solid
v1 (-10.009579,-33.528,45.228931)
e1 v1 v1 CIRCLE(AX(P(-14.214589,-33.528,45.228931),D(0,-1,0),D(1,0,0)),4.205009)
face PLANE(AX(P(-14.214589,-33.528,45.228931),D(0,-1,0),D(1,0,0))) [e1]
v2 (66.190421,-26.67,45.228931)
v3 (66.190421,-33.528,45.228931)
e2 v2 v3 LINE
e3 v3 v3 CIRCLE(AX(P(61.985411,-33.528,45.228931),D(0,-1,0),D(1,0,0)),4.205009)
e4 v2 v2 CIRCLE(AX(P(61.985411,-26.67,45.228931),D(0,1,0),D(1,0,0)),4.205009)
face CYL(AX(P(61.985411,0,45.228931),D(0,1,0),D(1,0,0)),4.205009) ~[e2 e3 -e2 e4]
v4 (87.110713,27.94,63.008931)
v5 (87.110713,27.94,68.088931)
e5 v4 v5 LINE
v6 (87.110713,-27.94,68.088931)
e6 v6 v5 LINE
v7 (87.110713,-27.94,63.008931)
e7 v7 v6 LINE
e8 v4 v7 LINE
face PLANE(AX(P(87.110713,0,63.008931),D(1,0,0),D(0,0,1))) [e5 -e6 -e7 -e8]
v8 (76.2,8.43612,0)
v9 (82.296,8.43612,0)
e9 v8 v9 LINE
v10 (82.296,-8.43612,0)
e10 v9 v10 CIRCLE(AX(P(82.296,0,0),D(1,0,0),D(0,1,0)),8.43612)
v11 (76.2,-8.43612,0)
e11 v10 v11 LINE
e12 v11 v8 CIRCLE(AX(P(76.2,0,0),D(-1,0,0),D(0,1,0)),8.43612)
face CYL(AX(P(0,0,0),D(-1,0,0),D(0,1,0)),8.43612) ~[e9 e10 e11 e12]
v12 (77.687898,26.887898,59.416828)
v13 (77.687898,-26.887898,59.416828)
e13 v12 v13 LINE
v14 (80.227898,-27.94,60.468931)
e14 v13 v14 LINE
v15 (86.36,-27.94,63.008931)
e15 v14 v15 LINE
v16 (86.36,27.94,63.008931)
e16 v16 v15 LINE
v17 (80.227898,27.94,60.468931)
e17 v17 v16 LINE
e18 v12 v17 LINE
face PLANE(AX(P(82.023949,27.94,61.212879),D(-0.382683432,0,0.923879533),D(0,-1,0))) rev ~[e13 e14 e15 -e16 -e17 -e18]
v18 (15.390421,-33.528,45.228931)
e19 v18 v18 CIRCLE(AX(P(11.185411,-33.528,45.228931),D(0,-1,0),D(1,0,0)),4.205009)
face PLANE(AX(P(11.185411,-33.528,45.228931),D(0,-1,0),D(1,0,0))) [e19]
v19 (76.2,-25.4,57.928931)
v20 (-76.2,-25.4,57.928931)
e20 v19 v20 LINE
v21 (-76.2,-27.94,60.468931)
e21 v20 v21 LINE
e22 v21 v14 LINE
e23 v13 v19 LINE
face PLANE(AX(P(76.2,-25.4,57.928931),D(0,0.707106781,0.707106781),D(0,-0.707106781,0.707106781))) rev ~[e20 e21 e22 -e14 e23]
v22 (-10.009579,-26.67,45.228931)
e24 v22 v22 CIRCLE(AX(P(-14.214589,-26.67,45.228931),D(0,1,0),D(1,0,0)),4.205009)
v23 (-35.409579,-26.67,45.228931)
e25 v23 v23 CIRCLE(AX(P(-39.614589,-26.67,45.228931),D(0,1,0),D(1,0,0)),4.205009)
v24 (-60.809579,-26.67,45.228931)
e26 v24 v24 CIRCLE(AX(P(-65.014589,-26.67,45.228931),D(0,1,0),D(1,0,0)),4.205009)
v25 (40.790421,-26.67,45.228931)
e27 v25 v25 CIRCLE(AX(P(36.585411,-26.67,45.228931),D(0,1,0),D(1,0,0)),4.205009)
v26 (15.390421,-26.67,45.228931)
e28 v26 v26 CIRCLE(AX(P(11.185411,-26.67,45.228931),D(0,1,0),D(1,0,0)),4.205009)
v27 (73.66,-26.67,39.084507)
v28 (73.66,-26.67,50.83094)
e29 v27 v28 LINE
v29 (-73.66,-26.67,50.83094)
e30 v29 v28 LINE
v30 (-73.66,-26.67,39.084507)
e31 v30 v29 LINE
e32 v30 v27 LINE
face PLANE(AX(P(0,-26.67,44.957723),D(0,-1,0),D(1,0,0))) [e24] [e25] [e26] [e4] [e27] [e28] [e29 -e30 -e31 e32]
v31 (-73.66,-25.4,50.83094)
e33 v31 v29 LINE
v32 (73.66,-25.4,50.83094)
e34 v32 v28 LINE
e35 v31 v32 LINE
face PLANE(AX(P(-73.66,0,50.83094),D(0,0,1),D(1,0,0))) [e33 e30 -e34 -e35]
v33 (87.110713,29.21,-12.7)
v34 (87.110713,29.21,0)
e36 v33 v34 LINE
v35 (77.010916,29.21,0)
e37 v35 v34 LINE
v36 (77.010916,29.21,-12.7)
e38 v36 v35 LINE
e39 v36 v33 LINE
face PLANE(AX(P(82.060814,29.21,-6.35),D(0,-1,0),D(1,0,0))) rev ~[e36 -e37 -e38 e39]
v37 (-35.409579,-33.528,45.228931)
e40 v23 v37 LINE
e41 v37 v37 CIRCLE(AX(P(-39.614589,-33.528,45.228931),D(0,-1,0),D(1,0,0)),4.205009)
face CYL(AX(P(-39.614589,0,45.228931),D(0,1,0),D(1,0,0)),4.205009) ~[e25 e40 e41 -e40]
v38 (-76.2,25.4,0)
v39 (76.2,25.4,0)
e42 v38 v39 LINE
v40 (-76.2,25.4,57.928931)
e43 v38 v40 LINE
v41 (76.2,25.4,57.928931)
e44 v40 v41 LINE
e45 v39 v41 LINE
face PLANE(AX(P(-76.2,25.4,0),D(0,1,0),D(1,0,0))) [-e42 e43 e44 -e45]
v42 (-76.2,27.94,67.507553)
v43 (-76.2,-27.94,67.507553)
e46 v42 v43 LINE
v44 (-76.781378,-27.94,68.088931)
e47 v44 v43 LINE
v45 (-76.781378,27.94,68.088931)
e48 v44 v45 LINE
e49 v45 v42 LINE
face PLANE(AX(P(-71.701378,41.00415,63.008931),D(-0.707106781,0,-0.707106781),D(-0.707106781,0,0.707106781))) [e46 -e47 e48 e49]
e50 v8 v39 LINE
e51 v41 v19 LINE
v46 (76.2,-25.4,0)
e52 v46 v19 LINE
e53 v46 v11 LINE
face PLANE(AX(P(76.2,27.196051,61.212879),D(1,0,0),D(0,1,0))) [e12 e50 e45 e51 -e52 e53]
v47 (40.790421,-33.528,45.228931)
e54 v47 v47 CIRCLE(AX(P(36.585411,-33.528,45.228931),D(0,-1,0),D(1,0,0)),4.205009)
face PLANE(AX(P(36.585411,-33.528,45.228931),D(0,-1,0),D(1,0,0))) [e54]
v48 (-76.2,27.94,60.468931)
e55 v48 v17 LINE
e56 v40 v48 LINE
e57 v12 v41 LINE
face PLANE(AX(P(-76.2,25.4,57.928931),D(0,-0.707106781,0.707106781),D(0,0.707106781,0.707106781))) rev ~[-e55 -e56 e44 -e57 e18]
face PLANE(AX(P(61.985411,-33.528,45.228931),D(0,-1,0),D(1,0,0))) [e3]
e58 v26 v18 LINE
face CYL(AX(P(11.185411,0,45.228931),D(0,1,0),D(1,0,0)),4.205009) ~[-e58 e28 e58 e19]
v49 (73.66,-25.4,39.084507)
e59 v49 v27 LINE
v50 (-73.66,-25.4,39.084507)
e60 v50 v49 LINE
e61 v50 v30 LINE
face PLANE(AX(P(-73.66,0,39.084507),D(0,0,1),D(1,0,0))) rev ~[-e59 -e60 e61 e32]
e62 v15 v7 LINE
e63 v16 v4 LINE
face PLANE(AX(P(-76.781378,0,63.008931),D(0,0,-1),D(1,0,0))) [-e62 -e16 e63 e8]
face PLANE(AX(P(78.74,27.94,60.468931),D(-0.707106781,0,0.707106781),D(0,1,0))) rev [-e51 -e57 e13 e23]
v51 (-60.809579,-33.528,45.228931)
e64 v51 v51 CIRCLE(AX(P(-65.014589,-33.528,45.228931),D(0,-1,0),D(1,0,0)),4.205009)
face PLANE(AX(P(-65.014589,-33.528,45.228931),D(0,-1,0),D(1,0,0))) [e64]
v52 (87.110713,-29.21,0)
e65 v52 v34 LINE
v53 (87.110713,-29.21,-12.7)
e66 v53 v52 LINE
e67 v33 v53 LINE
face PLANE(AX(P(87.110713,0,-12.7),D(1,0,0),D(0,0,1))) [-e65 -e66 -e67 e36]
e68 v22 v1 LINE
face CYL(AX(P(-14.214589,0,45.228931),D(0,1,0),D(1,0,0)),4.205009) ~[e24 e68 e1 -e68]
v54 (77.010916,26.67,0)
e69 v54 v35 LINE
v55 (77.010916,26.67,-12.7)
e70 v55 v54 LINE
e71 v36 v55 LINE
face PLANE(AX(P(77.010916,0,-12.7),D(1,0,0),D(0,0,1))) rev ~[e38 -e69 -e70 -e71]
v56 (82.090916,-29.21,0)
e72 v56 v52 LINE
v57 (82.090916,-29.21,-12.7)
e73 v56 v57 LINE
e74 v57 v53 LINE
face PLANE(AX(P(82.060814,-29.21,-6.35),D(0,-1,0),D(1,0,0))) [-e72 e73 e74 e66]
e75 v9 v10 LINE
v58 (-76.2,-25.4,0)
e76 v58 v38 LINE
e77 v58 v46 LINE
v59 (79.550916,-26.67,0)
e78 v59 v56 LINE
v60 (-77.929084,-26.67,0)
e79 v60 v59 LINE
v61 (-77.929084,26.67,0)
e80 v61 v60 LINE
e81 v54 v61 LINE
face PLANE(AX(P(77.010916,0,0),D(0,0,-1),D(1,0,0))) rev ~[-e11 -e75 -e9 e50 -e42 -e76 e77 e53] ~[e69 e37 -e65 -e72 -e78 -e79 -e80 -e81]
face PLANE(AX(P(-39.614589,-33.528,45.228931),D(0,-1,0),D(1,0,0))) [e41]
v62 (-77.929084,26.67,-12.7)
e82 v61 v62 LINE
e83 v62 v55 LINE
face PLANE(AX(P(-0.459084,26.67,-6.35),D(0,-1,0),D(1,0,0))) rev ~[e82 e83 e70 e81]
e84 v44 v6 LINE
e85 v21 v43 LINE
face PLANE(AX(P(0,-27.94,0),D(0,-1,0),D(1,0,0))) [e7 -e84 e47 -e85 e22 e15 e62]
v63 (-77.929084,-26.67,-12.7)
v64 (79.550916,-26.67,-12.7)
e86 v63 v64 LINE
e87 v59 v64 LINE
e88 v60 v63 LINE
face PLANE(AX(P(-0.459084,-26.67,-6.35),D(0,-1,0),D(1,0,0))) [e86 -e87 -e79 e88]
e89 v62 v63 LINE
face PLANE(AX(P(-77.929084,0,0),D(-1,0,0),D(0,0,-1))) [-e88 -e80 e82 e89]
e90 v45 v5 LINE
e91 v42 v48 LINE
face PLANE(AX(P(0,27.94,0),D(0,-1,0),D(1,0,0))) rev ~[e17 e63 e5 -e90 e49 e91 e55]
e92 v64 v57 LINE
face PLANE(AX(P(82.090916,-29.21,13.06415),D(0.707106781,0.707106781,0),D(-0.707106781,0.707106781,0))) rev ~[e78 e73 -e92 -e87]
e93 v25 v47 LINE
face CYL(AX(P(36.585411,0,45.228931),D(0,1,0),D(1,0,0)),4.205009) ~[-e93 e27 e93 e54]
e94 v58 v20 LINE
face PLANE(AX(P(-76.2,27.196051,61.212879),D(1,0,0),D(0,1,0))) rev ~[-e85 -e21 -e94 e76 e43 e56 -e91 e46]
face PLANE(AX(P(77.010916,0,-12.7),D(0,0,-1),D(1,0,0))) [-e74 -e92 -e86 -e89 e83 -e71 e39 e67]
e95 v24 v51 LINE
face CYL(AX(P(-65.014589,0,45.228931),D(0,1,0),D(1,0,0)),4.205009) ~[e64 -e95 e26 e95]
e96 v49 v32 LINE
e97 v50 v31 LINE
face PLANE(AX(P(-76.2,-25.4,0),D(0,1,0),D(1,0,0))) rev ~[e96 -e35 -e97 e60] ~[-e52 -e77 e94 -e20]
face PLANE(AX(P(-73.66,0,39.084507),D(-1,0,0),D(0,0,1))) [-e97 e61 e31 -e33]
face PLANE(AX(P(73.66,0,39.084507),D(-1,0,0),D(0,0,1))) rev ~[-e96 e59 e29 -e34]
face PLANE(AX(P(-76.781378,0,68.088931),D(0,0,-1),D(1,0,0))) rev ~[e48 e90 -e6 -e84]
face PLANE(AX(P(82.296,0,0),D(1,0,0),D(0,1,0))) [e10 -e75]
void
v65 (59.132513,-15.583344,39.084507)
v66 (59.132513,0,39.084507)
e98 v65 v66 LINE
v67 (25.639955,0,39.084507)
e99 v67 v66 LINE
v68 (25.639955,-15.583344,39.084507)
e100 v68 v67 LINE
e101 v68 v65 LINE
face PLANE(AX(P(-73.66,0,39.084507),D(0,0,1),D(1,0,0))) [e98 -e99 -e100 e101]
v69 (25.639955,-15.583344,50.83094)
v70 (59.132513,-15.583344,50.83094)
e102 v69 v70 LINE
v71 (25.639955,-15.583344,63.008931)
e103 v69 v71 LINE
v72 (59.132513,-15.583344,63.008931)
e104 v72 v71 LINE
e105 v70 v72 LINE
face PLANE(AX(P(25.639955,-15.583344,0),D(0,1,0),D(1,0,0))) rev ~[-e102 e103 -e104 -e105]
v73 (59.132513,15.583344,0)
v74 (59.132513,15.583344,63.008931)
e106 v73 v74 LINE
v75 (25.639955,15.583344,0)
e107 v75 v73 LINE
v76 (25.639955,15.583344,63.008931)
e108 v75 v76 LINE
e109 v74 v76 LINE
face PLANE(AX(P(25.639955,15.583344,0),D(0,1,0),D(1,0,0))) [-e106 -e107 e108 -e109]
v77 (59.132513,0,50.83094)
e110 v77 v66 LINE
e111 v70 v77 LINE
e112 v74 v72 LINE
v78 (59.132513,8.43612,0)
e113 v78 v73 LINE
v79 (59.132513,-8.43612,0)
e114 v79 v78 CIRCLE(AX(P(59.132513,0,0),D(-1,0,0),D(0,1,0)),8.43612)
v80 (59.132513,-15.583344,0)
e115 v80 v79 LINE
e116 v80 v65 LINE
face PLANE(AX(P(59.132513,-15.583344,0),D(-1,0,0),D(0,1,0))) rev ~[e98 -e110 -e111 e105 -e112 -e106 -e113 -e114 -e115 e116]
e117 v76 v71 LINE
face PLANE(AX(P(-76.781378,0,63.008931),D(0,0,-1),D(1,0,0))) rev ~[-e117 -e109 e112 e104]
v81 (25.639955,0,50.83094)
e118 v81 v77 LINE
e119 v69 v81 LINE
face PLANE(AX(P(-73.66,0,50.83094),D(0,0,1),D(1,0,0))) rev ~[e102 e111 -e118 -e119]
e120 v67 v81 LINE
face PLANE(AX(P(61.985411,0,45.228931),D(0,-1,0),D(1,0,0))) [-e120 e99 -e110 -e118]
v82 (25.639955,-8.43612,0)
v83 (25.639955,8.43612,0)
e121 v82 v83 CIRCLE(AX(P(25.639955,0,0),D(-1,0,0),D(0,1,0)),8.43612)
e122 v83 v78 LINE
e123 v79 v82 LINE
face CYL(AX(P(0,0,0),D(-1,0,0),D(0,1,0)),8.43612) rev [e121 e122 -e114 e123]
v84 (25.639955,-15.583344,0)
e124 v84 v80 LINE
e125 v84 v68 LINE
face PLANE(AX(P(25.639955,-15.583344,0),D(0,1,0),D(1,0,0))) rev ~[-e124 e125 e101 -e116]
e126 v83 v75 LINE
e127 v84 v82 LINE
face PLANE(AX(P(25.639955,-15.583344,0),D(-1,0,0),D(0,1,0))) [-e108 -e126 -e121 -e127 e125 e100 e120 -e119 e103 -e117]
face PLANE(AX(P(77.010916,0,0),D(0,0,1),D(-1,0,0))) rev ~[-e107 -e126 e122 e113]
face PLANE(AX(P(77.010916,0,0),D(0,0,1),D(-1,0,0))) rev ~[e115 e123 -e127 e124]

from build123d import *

# Parameters (mm, degrees)
F0_W         = 152.4
F0_H         = 50.8
F0_W_2       = 33.4925577044
F0_H_2       = 31.1666876078
F1_DEPTH     = 63.5
F3_DEPTH     = 26.67
F2_W         = 163.8920905882
F2_H         = 5.08
F4_DEPTH     = 27.94
F2_W_2       = 10.0997969608
F2_H_2       = 12.7
F5_DEPTH     = 29.21
F6_T4_DEPTH  = 152.4
F6_T9_DEPTH  = 152.4
F6_T14_DEPTH = 38.8282991577
F7_T4_DEPTH  = 82.0082991577
F8_SIZE      = 5.08
F9_SIZE      = 5.08
F10_R        = 4.2050090424
F11_DEPTH    = 33.528
F12_W        = 147.32
F12_H        = 11.7464326172
F13_DEPTH    = 26.67
F14_R        = 8.4361197875
F15_DEPTH    = 82.296


# Not quite as in the source:
# - a fillet or chamfer that OpenCascade refuses, or shapes differently, is made with other operations: its cross-section is extruded or revolved along the edge and cut away or added


with BuildPart() as f1:
    # F0 (on Top) → F1 (new body)
    with BuildSketch(Plane.XY):
        Rectangle(F0_W, F0_H)
        with Locations((42.3862338066, 0)):
            Rectangle(F0_W_2, F0_H_2, mode=Mode.SUBTRACT)
    extrude(amount=F1_DEPTH)

    # F2 (on Front) → F3 (join, symmetric)
    with BuildSketch(Plane.XZ):
        Polygon((77.0109159804, 0), (-77.9290840196, 0), (-77.9290840196, -12.7), (4.4760434559, -12.7), (65.76342, -12.7), (77.0109159804, -12.7), align=None)
    extrude(amount=F3_DEPTH, both=True)

    # F2 (on Front) → F4 (join, symmetric)
    with BuildSketch(Plane.XZ):
        with Locations((5.1646676471, 65.5489305882)):
            Rectangle(F2_W, F2_H)
    extrude(amount=F4_DEPTH, both=True)

    # F2 (on Front) → F5 (join, symmetric)
    with BuildSketch(Plane.XZ):
        with Locations((82.0608144608, -6.35)):
            Rectangle(F2_W_2, F2_H_2)
    extrude(amount=F5_DEPTH, both=True)

    # F6: chamfer of 5.08 on 3 edges, made by hand


with BuildPart() as f6_tool2:
    # F6_s3 → F6_t4 (new body)
    with BuildSketch(Plane.YZ.offset(76.2)):
        Polygon((-25.4, 57.9289305882), (-30.48, 63.0089305882), (-25.4, 63.0089305882), align=None)
    extrude(amount=-F6_T4_DEPTH)

    split(bisect_by=Plane.XZ.offset(27.94), keep=Keep.BOTTOM)


with BuildPart() as f1_1:
    add(f1.part)

    # F6_t1: union F6_tool2
    add(f6_tool2.part)


with BuildPart() as f6_tool7:
    # F6_s8 → F6_t9 (new body)
    with BuildSketch(Plane.YZ.offset(-76.2)):
        Polygon((25.4, 57.9289305882), (30.48, 63.0089305882), (25.4, 63.0089305882), align=None)
    extrude(amount=F6_T9_DEPTH)

    split(bisect_by=Plane.XZ.offset(-27.94), keep=Keep.TOP)


with BuildPart() as f1_2:
    add(f1_1.part)

    # F6_t6: union F6_tool7
    add(f6_tool7.part)


with BuildPart() as f6_tool12:
    # F6_s13 → F6_t14 (new body)
    with BuildSketch(Plane.XY.offset(13.0641495789)):
        Polygon((82.0909159804, -29.21), (77.0109159804, -24.13), (77.0109159804, -29.21), align=None)
    extrude(amount=-F6_T14_DEPTH)

    split(bisect_by=Plane.XZ.offset(26.67), keep=Keep.TOP)


with BuildPart() as f1_3:
    add(f1_2.part)

    # F6_t11: cut F6_tool12
    add(f6_tool12.part, mode=Mode.SUBTRACT)

    # F7: chamfer of 5.08 on 1 edges, made by hand


with BuildPart() as f7_tool2:
    # F7_s3 → F7_t4 (new body)
    with BuildSketch(Plane.XZ.offset(-41.0041495789)):
        Polygon((-71.7013776471, 63.0089305882), (-76.7813776471, 68.0889305882), (-76.7813776471, 63.0089305882), align=None)
    extrude(amount=F7_T4_DEPTH)

    split(bisect_by=Plane.YZ.offset(-76.2), keep=Keep.BOTTOM)


with BuildPart() as f1_4:
    add(f1_3.part)

    # F7_t1: cut F7_tool2
    add(f7_tool2.part, mode=Mode.SUBTRACT)

    # F8
    f8_edges = [f1_4.edges().sort_by_distance(p)[0] for p in [
        (76.2, 0, 63.008931),
    ]]
    chamfer(f8_edges, length=F8_SIZE)

    # F9
    f9_edges = [f1_4.edges().sort_by_distance(p)[0] for p in [
        (81.28, 0, 63.008931),
    ]]
    chamfer(f9_edges, length=F9_SIZE)

    # F10 (on Front) → F11 (join)
    with BuildSketch(Plane.XZ):
        with Locations((-65.0145885289, 45.2289305882)):
            Circle(F10_R)
        with Locations((-39.6145885289, 45.2289305882)):
            Circle(F10_R)
        with Locations((-14.2145885289, 45.2289305882)):
            Circle(F10_R)
        with Locations((11.1854114711, 45.2289305882)):
            Circle(F10_R)
        with Locations((36.5854114711, 45.2289305882)):
            Circle(F10_R)
        with Locations((61.9854114711, 45.2289305882)):
            Circle(F10_R)
    extrude(amount=F11_DEPTH)

    # F12 (on Front) → F13 (join)
    with BuildSketch(Plane.XZ):
        with Locations((0, 44.957723322)):
            Rectangle(F12_W, F12_H)
    extrude(amount=F13_DEPTH)

    # F14 (on Right) → F15 (join)
    with BuildSketch(Plane.YZ):
        Circle(F14_R)
    extrude(amount=F15_DEPTH)


solid = f1_4.part
